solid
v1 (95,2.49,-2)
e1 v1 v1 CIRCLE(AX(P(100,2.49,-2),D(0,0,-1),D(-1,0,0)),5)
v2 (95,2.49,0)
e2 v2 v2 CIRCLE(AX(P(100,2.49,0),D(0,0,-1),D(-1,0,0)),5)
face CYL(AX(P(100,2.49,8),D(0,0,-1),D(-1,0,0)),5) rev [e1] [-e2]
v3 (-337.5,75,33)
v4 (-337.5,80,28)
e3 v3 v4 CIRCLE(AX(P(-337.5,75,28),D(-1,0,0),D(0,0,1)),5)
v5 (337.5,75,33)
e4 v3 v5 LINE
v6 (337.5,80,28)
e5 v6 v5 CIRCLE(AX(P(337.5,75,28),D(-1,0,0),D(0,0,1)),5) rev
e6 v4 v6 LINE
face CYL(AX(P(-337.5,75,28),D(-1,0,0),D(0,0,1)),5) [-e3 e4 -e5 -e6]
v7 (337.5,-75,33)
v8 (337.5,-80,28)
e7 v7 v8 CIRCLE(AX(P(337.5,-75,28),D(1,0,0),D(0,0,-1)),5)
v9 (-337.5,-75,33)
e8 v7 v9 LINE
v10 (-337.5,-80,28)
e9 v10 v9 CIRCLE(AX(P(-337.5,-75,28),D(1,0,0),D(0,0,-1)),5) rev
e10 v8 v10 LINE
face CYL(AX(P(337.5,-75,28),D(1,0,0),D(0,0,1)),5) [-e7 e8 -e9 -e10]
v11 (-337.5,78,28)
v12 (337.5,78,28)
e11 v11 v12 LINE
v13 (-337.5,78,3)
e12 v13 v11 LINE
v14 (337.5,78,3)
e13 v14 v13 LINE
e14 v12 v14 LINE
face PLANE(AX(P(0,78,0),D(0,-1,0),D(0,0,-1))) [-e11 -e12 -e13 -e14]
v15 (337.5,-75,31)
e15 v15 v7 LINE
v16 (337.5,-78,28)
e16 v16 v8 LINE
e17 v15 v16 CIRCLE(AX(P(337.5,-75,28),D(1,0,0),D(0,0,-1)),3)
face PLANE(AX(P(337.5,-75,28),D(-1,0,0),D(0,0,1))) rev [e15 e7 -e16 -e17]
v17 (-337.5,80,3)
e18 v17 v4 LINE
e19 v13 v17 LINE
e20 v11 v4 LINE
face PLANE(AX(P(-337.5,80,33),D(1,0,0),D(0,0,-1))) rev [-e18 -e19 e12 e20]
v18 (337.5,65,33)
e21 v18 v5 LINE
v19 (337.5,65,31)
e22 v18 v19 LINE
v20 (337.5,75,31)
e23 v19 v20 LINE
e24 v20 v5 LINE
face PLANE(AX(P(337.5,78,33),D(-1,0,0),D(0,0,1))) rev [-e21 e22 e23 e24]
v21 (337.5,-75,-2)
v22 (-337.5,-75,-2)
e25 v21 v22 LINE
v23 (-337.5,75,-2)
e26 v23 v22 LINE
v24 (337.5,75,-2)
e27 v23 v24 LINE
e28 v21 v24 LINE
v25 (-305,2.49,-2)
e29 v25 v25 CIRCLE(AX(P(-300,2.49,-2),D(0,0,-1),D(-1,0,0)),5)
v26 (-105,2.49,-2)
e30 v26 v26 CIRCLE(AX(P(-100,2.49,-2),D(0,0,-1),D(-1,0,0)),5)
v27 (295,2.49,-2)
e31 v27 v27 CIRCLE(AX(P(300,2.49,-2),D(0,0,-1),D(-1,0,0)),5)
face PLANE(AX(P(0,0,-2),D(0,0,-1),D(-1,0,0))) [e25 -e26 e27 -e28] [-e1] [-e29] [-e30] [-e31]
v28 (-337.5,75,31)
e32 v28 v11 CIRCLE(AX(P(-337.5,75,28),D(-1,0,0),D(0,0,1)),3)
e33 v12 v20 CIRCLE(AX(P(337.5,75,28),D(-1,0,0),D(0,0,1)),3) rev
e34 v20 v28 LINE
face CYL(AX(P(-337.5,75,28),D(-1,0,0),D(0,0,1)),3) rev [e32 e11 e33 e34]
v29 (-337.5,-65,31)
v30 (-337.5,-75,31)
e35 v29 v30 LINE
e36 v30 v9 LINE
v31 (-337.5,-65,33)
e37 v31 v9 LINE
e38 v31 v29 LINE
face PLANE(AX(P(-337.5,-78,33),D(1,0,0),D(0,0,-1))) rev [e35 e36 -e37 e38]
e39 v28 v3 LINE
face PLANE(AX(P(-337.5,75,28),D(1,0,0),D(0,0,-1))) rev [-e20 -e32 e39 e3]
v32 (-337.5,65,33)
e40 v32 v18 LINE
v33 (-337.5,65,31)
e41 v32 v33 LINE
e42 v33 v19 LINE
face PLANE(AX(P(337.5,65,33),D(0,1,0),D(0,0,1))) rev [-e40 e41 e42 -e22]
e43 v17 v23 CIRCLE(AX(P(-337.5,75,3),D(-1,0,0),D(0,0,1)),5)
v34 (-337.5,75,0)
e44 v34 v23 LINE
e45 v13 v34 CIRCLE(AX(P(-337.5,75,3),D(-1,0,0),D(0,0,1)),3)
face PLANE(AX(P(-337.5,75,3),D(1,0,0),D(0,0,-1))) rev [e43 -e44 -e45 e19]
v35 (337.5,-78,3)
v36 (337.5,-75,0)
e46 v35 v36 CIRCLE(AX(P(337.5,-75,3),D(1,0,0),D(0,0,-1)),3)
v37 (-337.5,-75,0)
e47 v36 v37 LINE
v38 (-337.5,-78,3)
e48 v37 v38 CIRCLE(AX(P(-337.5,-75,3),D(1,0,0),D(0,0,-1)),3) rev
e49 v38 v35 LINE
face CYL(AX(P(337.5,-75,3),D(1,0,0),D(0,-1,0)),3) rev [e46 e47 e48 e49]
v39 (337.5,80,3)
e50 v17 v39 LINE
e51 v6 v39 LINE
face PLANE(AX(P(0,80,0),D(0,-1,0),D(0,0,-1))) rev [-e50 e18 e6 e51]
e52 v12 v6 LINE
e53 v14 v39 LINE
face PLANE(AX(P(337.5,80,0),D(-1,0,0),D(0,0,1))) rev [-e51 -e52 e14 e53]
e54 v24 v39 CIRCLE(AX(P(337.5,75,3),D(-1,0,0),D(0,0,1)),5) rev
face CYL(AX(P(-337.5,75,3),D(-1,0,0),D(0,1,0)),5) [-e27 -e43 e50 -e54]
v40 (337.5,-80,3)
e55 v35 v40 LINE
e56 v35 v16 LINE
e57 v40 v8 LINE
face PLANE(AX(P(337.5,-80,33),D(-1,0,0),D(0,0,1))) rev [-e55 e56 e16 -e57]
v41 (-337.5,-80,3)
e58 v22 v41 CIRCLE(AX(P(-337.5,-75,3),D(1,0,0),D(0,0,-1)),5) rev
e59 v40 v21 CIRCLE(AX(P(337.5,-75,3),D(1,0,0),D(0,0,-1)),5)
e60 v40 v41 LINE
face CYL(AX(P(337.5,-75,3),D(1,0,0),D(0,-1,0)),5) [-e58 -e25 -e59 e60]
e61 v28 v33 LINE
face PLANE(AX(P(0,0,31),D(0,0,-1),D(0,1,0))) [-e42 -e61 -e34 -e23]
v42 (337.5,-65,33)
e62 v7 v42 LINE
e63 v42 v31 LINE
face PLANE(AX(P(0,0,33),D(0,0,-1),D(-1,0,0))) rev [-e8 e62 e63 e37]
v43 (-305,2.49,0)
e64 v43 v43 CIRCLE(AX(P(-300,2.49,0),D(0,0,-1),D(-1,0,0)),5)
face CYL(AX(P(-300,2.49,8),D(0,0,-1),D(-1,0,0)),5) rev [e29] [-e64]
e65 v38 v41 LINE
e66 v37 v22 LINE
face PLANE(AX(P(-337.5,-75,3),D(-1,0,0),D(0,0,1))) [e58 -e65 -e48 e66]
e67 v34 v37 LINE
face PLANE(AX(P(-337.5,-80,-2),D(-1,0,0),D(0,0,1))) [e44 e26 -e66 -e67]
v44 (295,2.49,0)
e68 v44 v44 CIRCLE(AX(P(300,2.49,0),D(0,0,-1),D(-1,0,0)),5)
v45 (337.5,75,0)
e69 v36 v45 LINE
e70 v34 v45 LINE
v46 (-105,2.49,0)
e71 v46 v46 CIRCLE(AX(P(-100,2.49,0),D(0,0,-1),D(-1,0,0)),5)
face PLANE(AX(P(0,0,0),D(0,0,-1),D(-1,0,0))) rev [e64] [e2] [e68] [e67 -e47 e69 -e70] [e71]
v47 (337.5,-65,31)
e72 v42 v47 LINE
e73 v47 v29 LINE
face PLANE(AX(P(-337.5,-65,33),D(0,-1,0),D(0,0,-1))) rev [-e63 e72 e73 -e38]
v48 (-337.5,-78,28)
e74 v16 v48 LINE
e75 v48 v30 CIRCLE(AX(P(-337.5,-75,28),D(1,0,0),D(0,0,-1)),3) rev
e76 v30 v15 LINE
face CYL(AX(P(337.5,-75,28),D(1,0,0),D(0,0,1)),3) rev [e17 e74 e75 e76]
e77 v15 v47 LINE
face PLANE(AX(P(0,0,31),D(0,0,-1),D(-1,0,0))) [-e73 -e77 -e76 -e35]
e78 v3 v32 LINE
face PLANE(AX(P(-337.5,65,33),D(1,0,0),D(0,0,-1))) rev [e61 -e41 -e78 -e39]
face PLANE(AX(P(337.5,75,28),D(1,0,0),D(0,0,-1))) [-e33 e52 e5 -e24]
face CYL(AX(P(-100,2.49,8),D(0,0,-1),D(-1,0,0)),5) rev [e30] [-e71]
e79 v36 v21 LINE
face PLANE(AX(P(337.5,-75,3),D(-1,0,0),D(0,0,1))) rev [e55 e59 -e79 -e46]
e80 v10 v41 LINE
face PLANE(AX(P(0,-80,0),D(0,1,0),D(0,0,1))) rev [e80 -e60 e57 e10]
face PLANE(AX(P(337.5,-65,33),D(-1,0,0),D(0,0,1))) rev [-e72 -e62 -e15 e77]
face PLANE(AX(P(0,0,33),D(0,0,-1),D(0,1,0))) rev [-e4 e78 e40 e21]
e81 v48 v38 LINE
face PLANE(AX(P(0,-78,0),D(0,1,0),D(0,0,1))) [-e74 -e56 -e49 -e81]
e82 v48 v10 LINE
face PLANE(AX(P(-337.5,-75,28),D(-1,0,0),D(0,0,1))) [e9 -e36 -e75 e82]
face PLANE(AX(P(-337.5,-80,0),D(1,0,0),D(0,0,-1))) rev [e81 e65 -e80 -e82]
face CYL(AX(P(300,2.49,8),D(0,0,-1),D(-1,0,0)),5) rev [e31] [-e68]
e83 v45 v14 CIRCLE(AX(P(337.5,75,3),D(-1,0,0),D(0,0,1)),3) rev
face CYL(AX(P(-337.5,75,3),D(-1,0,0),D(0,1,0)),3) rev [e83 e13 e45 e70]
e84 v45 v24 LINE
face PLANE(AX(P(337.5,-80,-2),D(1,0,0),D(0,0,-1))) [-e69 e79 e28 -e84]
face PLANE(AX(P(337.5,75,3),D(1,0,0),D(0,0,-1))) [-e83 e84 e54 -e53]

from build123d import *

# Parameters (mm, degrees)
SKETCH1_W                      = 675
SKETCH1_H                      = 160
BASE_FLANGE1_DEPTH             = 2
EDGE_FLANGE1_STRIP_W           = 14
EDGE_FLANGE1_STRIP_H           = 2
EDGE_FLANGE1_STRIP_CUT_DEPTH   = 675
EDGE_FLANGE1_STRIP_2_W         = 14
EDGE_FLANGE1_STRIP_2_H         = 2
EDGE_FLANGE1_STRIP_CUT_2_DEPTH = 675
EDGE_FLANGE1_DEPTH             = 675
EDGE_FLANGE1_BEND_DEPTH        = 675
EDGE_FLANGE2_STRIP_W           = 14
EDGE_FLANGE2_STRIP_H           = 2
EDGE_FLANGE2_STRIP_CUT_DEPTH   = 675
EDGE_FLANGE2_STRIP_2_W         = 14
EDGE_FLANGE2_STRIP_2_H         = 2
EDGE_FLANGE2_STRIP_CUT_2_DEPTH = 675
EDGE_FLANGE2_DEPTH             = 675
EDGE_FLANGE2_BEND_DEPTH        = 675
SKETCH18_R                     = 5
CUT_EXTRUDE1_DEPTH             = 10
LPATTERN1_COUNT                = 4
LPATTERN1_PITCH                = 200


# Sheet-metal steps are written as plain solids
with BuildPart() as part:
    # Sketch1 → Base-Flange1 (new body)
    with BuildSketch(Plane.XY):
        Rectangle(SKETCH1_W, SKETCH1_H)
    extrude(amount=-BASE_FLANGE1_DEPTH)

    # Edge-Flange1 strip (across the edge) → Edge-Flange1 strip cut (cut)
    with BuildSketch(Plane(origin=(337.5, 80, 0), x_dir=(0, -1, 0), z_dir=(-1, 0, 0))):
        with Locations((-2, -1)):
            Rectangle(EDGE_FLANGE1_STRIP_W, EDGE_FLANGE1_STRIP_H)
    extrude(amount=EDGE_FLANGE1_STRIP_CUT_DEPTH, mode=Mode.SUBTRACT)

    # Edge-Flange1 strip 2 (across the edge) → Edge-Flange1 strip cut 2 (cut)
    with BuildSketch(Plane(origin=(-337.5, -80, 0), x_dir=(0, 1, 0), z_dir=(1, 0, 0))):
        with Locations((-2, -1)):
            Rectangle(EDGE_FLANGE1_STRIP_2_W, EDGE_FLANGE1_STRIP_2_H)
    extrude(amount=EDGE_FLANGE1_STRIP_CUT_2_DEPTH, mode=Mode.SUBTRACT)

    # Edge-Flange1 section (across the edge) → Edge-Flange1 (add)
    with BuildSketch(Plane(origin=(337.5, 80, 0), x_dir=(0, -1, 0), z_dir=(-1, 0, 0))):
        with BuildLine():
            Line((0, 3), (0, 33))
            Line((0, 33), (2, 33))
            Line((2, 33), (2, 3))
            ThreePointArc((2, 3), (2.878679656, 0.878679656), (5, 0))
            Line((5, 0), (5, -2))
            ThreePointArc((5, -2), (1.464466094, -0.535533906), (0, 3))
        make_face()
    extrude(amount=EDGE_FLANGE1_DEPTH)

    # Edge-Flange1 section 2 (across the edge) → Edge-Flange1 bend (add)
    with BuildSketch(Plane(origin=(-337.5, -80, 0), x_dir=(0, 1, 0), z_dir=(1, 0, 0))):
        with BuildLine():
            Line((0, 3), (0, 33))
            Line((0, 33), (2, 33))
            Line((2, 33), (2, 3))
            ThreePointArc((2, 3), (2.878679656, 0.878679656), (5, 0))
            Line((5, 0), (5, -2))
            ThreePointArc((5, -2), (1.464466094, -0.535533906), (0, 3))
        make_face()
    extrude(amount=EDGE_FLANGE1_BEND_DEPTH)

    # Edge-Flange2 strip (across the edge) → Edge-Flange2 strip cut (cut)
    with BuildSketch(Plane(origin=(-337.5, -78, 33), x_dir=(0, 0, -1), z_dir=(1, 0, 0))):
        with Locations((-2, -1)):
            Rectangle(EDGE_FLANGE2_STRIP_W, EDGE_FLANGE2_STRIP_H)
    extrude(amount=EDGE_FLANGE2_STRIP_CUT_DEPTH, mode=Mode.SUBTRACT)

    # Edge-Flange2 strip 2 (across the edge) → Edge-Flange2 strip cut 2 (cut)
    with BuildSketch(Plane(origin=(337.5, 78, 33), x_dir=(0, 0, -1), z_dir=(-1, 0, 0))):
        with Locations((-2, -1)):
            Rectangle(EDGE_FLANGE2_STRIP_2_W, EDGE_FLANGE2_STRIP_2_H)
    extrude(amount=EDGE_FLANGE2_STRIP_CUT_2_DEPTH, mode=Mode.SUBTRACT)

    # Edge-Flange2 section (across the edge) → Edge-Flange2 (add)
    with BuildSketch(Plane(origin=(-337.5, -78, 33), x_dir=(0, 0, -1), z_dir=(1, 0, 0))):
        with BuildLine():
            Line((0, 3), (0, 13))
            Line((0, 13), (2, 13))
            Line((2, 13), (2, 3))
            ThreePointArc((2, 3), (2.878679656, 0.878679656), (5, 0))
            Line((5, 0), (5, -2))
            ThreePointArc((5, -2), (1.464466094, -0.535533906), (0, 3))
        make_face()
    extrude(amount=EDGE_FLANGE2_DEPTH)

    # Edge-Flange2 section 2 (across the edge) → Edge-Flange2 bend (add)
    with BuildSketch(Plane(origin=(337.5, 78, 33), x_dir=(0, 0, -1), z_dir=(-1, 0, 0))):
        with BuildLine():
            Line((0, 3), (0, 13))
            Line((0, 13), (2, 13))
            Line((2, 13), (2, 3))
            ThreePointArc((2, 3), (2.878679656, 0.878679656), (5, 0))
            Line((5, 0), (5, -2))
            ThreePointArc((5, -2), (1.464466094, -0.535533906), (0, 3))
        make_face()
    extrude(amount=EDGE_FLANGE2_BEND_DEPTH)

    # Sketch18 → Cut-Extrude1 (cut)
    with BuildSketch(Plane(origin=(0, 0, -2), x_dir=(-1, 0, 0), z_dir=(0, 0, -1))):
        with Locations((-300, 2.49)):
            Circle(SKETCH18_R)
    cut_extrude1 = extrude(amount=-CUT_EXTRUDE1_DEPTH, mode=Mode.SUBTRACT)

    # LPattern1: Cut-Extrude1 ×4
    with Locations(*[(-i * LPATTERN1_PITCH, 0, 0) for i in range(1, LPATTERN1_COUNT)]):
        add(cut_extrude1, mode=Mode.SUBTRACT)


solid = part.part
